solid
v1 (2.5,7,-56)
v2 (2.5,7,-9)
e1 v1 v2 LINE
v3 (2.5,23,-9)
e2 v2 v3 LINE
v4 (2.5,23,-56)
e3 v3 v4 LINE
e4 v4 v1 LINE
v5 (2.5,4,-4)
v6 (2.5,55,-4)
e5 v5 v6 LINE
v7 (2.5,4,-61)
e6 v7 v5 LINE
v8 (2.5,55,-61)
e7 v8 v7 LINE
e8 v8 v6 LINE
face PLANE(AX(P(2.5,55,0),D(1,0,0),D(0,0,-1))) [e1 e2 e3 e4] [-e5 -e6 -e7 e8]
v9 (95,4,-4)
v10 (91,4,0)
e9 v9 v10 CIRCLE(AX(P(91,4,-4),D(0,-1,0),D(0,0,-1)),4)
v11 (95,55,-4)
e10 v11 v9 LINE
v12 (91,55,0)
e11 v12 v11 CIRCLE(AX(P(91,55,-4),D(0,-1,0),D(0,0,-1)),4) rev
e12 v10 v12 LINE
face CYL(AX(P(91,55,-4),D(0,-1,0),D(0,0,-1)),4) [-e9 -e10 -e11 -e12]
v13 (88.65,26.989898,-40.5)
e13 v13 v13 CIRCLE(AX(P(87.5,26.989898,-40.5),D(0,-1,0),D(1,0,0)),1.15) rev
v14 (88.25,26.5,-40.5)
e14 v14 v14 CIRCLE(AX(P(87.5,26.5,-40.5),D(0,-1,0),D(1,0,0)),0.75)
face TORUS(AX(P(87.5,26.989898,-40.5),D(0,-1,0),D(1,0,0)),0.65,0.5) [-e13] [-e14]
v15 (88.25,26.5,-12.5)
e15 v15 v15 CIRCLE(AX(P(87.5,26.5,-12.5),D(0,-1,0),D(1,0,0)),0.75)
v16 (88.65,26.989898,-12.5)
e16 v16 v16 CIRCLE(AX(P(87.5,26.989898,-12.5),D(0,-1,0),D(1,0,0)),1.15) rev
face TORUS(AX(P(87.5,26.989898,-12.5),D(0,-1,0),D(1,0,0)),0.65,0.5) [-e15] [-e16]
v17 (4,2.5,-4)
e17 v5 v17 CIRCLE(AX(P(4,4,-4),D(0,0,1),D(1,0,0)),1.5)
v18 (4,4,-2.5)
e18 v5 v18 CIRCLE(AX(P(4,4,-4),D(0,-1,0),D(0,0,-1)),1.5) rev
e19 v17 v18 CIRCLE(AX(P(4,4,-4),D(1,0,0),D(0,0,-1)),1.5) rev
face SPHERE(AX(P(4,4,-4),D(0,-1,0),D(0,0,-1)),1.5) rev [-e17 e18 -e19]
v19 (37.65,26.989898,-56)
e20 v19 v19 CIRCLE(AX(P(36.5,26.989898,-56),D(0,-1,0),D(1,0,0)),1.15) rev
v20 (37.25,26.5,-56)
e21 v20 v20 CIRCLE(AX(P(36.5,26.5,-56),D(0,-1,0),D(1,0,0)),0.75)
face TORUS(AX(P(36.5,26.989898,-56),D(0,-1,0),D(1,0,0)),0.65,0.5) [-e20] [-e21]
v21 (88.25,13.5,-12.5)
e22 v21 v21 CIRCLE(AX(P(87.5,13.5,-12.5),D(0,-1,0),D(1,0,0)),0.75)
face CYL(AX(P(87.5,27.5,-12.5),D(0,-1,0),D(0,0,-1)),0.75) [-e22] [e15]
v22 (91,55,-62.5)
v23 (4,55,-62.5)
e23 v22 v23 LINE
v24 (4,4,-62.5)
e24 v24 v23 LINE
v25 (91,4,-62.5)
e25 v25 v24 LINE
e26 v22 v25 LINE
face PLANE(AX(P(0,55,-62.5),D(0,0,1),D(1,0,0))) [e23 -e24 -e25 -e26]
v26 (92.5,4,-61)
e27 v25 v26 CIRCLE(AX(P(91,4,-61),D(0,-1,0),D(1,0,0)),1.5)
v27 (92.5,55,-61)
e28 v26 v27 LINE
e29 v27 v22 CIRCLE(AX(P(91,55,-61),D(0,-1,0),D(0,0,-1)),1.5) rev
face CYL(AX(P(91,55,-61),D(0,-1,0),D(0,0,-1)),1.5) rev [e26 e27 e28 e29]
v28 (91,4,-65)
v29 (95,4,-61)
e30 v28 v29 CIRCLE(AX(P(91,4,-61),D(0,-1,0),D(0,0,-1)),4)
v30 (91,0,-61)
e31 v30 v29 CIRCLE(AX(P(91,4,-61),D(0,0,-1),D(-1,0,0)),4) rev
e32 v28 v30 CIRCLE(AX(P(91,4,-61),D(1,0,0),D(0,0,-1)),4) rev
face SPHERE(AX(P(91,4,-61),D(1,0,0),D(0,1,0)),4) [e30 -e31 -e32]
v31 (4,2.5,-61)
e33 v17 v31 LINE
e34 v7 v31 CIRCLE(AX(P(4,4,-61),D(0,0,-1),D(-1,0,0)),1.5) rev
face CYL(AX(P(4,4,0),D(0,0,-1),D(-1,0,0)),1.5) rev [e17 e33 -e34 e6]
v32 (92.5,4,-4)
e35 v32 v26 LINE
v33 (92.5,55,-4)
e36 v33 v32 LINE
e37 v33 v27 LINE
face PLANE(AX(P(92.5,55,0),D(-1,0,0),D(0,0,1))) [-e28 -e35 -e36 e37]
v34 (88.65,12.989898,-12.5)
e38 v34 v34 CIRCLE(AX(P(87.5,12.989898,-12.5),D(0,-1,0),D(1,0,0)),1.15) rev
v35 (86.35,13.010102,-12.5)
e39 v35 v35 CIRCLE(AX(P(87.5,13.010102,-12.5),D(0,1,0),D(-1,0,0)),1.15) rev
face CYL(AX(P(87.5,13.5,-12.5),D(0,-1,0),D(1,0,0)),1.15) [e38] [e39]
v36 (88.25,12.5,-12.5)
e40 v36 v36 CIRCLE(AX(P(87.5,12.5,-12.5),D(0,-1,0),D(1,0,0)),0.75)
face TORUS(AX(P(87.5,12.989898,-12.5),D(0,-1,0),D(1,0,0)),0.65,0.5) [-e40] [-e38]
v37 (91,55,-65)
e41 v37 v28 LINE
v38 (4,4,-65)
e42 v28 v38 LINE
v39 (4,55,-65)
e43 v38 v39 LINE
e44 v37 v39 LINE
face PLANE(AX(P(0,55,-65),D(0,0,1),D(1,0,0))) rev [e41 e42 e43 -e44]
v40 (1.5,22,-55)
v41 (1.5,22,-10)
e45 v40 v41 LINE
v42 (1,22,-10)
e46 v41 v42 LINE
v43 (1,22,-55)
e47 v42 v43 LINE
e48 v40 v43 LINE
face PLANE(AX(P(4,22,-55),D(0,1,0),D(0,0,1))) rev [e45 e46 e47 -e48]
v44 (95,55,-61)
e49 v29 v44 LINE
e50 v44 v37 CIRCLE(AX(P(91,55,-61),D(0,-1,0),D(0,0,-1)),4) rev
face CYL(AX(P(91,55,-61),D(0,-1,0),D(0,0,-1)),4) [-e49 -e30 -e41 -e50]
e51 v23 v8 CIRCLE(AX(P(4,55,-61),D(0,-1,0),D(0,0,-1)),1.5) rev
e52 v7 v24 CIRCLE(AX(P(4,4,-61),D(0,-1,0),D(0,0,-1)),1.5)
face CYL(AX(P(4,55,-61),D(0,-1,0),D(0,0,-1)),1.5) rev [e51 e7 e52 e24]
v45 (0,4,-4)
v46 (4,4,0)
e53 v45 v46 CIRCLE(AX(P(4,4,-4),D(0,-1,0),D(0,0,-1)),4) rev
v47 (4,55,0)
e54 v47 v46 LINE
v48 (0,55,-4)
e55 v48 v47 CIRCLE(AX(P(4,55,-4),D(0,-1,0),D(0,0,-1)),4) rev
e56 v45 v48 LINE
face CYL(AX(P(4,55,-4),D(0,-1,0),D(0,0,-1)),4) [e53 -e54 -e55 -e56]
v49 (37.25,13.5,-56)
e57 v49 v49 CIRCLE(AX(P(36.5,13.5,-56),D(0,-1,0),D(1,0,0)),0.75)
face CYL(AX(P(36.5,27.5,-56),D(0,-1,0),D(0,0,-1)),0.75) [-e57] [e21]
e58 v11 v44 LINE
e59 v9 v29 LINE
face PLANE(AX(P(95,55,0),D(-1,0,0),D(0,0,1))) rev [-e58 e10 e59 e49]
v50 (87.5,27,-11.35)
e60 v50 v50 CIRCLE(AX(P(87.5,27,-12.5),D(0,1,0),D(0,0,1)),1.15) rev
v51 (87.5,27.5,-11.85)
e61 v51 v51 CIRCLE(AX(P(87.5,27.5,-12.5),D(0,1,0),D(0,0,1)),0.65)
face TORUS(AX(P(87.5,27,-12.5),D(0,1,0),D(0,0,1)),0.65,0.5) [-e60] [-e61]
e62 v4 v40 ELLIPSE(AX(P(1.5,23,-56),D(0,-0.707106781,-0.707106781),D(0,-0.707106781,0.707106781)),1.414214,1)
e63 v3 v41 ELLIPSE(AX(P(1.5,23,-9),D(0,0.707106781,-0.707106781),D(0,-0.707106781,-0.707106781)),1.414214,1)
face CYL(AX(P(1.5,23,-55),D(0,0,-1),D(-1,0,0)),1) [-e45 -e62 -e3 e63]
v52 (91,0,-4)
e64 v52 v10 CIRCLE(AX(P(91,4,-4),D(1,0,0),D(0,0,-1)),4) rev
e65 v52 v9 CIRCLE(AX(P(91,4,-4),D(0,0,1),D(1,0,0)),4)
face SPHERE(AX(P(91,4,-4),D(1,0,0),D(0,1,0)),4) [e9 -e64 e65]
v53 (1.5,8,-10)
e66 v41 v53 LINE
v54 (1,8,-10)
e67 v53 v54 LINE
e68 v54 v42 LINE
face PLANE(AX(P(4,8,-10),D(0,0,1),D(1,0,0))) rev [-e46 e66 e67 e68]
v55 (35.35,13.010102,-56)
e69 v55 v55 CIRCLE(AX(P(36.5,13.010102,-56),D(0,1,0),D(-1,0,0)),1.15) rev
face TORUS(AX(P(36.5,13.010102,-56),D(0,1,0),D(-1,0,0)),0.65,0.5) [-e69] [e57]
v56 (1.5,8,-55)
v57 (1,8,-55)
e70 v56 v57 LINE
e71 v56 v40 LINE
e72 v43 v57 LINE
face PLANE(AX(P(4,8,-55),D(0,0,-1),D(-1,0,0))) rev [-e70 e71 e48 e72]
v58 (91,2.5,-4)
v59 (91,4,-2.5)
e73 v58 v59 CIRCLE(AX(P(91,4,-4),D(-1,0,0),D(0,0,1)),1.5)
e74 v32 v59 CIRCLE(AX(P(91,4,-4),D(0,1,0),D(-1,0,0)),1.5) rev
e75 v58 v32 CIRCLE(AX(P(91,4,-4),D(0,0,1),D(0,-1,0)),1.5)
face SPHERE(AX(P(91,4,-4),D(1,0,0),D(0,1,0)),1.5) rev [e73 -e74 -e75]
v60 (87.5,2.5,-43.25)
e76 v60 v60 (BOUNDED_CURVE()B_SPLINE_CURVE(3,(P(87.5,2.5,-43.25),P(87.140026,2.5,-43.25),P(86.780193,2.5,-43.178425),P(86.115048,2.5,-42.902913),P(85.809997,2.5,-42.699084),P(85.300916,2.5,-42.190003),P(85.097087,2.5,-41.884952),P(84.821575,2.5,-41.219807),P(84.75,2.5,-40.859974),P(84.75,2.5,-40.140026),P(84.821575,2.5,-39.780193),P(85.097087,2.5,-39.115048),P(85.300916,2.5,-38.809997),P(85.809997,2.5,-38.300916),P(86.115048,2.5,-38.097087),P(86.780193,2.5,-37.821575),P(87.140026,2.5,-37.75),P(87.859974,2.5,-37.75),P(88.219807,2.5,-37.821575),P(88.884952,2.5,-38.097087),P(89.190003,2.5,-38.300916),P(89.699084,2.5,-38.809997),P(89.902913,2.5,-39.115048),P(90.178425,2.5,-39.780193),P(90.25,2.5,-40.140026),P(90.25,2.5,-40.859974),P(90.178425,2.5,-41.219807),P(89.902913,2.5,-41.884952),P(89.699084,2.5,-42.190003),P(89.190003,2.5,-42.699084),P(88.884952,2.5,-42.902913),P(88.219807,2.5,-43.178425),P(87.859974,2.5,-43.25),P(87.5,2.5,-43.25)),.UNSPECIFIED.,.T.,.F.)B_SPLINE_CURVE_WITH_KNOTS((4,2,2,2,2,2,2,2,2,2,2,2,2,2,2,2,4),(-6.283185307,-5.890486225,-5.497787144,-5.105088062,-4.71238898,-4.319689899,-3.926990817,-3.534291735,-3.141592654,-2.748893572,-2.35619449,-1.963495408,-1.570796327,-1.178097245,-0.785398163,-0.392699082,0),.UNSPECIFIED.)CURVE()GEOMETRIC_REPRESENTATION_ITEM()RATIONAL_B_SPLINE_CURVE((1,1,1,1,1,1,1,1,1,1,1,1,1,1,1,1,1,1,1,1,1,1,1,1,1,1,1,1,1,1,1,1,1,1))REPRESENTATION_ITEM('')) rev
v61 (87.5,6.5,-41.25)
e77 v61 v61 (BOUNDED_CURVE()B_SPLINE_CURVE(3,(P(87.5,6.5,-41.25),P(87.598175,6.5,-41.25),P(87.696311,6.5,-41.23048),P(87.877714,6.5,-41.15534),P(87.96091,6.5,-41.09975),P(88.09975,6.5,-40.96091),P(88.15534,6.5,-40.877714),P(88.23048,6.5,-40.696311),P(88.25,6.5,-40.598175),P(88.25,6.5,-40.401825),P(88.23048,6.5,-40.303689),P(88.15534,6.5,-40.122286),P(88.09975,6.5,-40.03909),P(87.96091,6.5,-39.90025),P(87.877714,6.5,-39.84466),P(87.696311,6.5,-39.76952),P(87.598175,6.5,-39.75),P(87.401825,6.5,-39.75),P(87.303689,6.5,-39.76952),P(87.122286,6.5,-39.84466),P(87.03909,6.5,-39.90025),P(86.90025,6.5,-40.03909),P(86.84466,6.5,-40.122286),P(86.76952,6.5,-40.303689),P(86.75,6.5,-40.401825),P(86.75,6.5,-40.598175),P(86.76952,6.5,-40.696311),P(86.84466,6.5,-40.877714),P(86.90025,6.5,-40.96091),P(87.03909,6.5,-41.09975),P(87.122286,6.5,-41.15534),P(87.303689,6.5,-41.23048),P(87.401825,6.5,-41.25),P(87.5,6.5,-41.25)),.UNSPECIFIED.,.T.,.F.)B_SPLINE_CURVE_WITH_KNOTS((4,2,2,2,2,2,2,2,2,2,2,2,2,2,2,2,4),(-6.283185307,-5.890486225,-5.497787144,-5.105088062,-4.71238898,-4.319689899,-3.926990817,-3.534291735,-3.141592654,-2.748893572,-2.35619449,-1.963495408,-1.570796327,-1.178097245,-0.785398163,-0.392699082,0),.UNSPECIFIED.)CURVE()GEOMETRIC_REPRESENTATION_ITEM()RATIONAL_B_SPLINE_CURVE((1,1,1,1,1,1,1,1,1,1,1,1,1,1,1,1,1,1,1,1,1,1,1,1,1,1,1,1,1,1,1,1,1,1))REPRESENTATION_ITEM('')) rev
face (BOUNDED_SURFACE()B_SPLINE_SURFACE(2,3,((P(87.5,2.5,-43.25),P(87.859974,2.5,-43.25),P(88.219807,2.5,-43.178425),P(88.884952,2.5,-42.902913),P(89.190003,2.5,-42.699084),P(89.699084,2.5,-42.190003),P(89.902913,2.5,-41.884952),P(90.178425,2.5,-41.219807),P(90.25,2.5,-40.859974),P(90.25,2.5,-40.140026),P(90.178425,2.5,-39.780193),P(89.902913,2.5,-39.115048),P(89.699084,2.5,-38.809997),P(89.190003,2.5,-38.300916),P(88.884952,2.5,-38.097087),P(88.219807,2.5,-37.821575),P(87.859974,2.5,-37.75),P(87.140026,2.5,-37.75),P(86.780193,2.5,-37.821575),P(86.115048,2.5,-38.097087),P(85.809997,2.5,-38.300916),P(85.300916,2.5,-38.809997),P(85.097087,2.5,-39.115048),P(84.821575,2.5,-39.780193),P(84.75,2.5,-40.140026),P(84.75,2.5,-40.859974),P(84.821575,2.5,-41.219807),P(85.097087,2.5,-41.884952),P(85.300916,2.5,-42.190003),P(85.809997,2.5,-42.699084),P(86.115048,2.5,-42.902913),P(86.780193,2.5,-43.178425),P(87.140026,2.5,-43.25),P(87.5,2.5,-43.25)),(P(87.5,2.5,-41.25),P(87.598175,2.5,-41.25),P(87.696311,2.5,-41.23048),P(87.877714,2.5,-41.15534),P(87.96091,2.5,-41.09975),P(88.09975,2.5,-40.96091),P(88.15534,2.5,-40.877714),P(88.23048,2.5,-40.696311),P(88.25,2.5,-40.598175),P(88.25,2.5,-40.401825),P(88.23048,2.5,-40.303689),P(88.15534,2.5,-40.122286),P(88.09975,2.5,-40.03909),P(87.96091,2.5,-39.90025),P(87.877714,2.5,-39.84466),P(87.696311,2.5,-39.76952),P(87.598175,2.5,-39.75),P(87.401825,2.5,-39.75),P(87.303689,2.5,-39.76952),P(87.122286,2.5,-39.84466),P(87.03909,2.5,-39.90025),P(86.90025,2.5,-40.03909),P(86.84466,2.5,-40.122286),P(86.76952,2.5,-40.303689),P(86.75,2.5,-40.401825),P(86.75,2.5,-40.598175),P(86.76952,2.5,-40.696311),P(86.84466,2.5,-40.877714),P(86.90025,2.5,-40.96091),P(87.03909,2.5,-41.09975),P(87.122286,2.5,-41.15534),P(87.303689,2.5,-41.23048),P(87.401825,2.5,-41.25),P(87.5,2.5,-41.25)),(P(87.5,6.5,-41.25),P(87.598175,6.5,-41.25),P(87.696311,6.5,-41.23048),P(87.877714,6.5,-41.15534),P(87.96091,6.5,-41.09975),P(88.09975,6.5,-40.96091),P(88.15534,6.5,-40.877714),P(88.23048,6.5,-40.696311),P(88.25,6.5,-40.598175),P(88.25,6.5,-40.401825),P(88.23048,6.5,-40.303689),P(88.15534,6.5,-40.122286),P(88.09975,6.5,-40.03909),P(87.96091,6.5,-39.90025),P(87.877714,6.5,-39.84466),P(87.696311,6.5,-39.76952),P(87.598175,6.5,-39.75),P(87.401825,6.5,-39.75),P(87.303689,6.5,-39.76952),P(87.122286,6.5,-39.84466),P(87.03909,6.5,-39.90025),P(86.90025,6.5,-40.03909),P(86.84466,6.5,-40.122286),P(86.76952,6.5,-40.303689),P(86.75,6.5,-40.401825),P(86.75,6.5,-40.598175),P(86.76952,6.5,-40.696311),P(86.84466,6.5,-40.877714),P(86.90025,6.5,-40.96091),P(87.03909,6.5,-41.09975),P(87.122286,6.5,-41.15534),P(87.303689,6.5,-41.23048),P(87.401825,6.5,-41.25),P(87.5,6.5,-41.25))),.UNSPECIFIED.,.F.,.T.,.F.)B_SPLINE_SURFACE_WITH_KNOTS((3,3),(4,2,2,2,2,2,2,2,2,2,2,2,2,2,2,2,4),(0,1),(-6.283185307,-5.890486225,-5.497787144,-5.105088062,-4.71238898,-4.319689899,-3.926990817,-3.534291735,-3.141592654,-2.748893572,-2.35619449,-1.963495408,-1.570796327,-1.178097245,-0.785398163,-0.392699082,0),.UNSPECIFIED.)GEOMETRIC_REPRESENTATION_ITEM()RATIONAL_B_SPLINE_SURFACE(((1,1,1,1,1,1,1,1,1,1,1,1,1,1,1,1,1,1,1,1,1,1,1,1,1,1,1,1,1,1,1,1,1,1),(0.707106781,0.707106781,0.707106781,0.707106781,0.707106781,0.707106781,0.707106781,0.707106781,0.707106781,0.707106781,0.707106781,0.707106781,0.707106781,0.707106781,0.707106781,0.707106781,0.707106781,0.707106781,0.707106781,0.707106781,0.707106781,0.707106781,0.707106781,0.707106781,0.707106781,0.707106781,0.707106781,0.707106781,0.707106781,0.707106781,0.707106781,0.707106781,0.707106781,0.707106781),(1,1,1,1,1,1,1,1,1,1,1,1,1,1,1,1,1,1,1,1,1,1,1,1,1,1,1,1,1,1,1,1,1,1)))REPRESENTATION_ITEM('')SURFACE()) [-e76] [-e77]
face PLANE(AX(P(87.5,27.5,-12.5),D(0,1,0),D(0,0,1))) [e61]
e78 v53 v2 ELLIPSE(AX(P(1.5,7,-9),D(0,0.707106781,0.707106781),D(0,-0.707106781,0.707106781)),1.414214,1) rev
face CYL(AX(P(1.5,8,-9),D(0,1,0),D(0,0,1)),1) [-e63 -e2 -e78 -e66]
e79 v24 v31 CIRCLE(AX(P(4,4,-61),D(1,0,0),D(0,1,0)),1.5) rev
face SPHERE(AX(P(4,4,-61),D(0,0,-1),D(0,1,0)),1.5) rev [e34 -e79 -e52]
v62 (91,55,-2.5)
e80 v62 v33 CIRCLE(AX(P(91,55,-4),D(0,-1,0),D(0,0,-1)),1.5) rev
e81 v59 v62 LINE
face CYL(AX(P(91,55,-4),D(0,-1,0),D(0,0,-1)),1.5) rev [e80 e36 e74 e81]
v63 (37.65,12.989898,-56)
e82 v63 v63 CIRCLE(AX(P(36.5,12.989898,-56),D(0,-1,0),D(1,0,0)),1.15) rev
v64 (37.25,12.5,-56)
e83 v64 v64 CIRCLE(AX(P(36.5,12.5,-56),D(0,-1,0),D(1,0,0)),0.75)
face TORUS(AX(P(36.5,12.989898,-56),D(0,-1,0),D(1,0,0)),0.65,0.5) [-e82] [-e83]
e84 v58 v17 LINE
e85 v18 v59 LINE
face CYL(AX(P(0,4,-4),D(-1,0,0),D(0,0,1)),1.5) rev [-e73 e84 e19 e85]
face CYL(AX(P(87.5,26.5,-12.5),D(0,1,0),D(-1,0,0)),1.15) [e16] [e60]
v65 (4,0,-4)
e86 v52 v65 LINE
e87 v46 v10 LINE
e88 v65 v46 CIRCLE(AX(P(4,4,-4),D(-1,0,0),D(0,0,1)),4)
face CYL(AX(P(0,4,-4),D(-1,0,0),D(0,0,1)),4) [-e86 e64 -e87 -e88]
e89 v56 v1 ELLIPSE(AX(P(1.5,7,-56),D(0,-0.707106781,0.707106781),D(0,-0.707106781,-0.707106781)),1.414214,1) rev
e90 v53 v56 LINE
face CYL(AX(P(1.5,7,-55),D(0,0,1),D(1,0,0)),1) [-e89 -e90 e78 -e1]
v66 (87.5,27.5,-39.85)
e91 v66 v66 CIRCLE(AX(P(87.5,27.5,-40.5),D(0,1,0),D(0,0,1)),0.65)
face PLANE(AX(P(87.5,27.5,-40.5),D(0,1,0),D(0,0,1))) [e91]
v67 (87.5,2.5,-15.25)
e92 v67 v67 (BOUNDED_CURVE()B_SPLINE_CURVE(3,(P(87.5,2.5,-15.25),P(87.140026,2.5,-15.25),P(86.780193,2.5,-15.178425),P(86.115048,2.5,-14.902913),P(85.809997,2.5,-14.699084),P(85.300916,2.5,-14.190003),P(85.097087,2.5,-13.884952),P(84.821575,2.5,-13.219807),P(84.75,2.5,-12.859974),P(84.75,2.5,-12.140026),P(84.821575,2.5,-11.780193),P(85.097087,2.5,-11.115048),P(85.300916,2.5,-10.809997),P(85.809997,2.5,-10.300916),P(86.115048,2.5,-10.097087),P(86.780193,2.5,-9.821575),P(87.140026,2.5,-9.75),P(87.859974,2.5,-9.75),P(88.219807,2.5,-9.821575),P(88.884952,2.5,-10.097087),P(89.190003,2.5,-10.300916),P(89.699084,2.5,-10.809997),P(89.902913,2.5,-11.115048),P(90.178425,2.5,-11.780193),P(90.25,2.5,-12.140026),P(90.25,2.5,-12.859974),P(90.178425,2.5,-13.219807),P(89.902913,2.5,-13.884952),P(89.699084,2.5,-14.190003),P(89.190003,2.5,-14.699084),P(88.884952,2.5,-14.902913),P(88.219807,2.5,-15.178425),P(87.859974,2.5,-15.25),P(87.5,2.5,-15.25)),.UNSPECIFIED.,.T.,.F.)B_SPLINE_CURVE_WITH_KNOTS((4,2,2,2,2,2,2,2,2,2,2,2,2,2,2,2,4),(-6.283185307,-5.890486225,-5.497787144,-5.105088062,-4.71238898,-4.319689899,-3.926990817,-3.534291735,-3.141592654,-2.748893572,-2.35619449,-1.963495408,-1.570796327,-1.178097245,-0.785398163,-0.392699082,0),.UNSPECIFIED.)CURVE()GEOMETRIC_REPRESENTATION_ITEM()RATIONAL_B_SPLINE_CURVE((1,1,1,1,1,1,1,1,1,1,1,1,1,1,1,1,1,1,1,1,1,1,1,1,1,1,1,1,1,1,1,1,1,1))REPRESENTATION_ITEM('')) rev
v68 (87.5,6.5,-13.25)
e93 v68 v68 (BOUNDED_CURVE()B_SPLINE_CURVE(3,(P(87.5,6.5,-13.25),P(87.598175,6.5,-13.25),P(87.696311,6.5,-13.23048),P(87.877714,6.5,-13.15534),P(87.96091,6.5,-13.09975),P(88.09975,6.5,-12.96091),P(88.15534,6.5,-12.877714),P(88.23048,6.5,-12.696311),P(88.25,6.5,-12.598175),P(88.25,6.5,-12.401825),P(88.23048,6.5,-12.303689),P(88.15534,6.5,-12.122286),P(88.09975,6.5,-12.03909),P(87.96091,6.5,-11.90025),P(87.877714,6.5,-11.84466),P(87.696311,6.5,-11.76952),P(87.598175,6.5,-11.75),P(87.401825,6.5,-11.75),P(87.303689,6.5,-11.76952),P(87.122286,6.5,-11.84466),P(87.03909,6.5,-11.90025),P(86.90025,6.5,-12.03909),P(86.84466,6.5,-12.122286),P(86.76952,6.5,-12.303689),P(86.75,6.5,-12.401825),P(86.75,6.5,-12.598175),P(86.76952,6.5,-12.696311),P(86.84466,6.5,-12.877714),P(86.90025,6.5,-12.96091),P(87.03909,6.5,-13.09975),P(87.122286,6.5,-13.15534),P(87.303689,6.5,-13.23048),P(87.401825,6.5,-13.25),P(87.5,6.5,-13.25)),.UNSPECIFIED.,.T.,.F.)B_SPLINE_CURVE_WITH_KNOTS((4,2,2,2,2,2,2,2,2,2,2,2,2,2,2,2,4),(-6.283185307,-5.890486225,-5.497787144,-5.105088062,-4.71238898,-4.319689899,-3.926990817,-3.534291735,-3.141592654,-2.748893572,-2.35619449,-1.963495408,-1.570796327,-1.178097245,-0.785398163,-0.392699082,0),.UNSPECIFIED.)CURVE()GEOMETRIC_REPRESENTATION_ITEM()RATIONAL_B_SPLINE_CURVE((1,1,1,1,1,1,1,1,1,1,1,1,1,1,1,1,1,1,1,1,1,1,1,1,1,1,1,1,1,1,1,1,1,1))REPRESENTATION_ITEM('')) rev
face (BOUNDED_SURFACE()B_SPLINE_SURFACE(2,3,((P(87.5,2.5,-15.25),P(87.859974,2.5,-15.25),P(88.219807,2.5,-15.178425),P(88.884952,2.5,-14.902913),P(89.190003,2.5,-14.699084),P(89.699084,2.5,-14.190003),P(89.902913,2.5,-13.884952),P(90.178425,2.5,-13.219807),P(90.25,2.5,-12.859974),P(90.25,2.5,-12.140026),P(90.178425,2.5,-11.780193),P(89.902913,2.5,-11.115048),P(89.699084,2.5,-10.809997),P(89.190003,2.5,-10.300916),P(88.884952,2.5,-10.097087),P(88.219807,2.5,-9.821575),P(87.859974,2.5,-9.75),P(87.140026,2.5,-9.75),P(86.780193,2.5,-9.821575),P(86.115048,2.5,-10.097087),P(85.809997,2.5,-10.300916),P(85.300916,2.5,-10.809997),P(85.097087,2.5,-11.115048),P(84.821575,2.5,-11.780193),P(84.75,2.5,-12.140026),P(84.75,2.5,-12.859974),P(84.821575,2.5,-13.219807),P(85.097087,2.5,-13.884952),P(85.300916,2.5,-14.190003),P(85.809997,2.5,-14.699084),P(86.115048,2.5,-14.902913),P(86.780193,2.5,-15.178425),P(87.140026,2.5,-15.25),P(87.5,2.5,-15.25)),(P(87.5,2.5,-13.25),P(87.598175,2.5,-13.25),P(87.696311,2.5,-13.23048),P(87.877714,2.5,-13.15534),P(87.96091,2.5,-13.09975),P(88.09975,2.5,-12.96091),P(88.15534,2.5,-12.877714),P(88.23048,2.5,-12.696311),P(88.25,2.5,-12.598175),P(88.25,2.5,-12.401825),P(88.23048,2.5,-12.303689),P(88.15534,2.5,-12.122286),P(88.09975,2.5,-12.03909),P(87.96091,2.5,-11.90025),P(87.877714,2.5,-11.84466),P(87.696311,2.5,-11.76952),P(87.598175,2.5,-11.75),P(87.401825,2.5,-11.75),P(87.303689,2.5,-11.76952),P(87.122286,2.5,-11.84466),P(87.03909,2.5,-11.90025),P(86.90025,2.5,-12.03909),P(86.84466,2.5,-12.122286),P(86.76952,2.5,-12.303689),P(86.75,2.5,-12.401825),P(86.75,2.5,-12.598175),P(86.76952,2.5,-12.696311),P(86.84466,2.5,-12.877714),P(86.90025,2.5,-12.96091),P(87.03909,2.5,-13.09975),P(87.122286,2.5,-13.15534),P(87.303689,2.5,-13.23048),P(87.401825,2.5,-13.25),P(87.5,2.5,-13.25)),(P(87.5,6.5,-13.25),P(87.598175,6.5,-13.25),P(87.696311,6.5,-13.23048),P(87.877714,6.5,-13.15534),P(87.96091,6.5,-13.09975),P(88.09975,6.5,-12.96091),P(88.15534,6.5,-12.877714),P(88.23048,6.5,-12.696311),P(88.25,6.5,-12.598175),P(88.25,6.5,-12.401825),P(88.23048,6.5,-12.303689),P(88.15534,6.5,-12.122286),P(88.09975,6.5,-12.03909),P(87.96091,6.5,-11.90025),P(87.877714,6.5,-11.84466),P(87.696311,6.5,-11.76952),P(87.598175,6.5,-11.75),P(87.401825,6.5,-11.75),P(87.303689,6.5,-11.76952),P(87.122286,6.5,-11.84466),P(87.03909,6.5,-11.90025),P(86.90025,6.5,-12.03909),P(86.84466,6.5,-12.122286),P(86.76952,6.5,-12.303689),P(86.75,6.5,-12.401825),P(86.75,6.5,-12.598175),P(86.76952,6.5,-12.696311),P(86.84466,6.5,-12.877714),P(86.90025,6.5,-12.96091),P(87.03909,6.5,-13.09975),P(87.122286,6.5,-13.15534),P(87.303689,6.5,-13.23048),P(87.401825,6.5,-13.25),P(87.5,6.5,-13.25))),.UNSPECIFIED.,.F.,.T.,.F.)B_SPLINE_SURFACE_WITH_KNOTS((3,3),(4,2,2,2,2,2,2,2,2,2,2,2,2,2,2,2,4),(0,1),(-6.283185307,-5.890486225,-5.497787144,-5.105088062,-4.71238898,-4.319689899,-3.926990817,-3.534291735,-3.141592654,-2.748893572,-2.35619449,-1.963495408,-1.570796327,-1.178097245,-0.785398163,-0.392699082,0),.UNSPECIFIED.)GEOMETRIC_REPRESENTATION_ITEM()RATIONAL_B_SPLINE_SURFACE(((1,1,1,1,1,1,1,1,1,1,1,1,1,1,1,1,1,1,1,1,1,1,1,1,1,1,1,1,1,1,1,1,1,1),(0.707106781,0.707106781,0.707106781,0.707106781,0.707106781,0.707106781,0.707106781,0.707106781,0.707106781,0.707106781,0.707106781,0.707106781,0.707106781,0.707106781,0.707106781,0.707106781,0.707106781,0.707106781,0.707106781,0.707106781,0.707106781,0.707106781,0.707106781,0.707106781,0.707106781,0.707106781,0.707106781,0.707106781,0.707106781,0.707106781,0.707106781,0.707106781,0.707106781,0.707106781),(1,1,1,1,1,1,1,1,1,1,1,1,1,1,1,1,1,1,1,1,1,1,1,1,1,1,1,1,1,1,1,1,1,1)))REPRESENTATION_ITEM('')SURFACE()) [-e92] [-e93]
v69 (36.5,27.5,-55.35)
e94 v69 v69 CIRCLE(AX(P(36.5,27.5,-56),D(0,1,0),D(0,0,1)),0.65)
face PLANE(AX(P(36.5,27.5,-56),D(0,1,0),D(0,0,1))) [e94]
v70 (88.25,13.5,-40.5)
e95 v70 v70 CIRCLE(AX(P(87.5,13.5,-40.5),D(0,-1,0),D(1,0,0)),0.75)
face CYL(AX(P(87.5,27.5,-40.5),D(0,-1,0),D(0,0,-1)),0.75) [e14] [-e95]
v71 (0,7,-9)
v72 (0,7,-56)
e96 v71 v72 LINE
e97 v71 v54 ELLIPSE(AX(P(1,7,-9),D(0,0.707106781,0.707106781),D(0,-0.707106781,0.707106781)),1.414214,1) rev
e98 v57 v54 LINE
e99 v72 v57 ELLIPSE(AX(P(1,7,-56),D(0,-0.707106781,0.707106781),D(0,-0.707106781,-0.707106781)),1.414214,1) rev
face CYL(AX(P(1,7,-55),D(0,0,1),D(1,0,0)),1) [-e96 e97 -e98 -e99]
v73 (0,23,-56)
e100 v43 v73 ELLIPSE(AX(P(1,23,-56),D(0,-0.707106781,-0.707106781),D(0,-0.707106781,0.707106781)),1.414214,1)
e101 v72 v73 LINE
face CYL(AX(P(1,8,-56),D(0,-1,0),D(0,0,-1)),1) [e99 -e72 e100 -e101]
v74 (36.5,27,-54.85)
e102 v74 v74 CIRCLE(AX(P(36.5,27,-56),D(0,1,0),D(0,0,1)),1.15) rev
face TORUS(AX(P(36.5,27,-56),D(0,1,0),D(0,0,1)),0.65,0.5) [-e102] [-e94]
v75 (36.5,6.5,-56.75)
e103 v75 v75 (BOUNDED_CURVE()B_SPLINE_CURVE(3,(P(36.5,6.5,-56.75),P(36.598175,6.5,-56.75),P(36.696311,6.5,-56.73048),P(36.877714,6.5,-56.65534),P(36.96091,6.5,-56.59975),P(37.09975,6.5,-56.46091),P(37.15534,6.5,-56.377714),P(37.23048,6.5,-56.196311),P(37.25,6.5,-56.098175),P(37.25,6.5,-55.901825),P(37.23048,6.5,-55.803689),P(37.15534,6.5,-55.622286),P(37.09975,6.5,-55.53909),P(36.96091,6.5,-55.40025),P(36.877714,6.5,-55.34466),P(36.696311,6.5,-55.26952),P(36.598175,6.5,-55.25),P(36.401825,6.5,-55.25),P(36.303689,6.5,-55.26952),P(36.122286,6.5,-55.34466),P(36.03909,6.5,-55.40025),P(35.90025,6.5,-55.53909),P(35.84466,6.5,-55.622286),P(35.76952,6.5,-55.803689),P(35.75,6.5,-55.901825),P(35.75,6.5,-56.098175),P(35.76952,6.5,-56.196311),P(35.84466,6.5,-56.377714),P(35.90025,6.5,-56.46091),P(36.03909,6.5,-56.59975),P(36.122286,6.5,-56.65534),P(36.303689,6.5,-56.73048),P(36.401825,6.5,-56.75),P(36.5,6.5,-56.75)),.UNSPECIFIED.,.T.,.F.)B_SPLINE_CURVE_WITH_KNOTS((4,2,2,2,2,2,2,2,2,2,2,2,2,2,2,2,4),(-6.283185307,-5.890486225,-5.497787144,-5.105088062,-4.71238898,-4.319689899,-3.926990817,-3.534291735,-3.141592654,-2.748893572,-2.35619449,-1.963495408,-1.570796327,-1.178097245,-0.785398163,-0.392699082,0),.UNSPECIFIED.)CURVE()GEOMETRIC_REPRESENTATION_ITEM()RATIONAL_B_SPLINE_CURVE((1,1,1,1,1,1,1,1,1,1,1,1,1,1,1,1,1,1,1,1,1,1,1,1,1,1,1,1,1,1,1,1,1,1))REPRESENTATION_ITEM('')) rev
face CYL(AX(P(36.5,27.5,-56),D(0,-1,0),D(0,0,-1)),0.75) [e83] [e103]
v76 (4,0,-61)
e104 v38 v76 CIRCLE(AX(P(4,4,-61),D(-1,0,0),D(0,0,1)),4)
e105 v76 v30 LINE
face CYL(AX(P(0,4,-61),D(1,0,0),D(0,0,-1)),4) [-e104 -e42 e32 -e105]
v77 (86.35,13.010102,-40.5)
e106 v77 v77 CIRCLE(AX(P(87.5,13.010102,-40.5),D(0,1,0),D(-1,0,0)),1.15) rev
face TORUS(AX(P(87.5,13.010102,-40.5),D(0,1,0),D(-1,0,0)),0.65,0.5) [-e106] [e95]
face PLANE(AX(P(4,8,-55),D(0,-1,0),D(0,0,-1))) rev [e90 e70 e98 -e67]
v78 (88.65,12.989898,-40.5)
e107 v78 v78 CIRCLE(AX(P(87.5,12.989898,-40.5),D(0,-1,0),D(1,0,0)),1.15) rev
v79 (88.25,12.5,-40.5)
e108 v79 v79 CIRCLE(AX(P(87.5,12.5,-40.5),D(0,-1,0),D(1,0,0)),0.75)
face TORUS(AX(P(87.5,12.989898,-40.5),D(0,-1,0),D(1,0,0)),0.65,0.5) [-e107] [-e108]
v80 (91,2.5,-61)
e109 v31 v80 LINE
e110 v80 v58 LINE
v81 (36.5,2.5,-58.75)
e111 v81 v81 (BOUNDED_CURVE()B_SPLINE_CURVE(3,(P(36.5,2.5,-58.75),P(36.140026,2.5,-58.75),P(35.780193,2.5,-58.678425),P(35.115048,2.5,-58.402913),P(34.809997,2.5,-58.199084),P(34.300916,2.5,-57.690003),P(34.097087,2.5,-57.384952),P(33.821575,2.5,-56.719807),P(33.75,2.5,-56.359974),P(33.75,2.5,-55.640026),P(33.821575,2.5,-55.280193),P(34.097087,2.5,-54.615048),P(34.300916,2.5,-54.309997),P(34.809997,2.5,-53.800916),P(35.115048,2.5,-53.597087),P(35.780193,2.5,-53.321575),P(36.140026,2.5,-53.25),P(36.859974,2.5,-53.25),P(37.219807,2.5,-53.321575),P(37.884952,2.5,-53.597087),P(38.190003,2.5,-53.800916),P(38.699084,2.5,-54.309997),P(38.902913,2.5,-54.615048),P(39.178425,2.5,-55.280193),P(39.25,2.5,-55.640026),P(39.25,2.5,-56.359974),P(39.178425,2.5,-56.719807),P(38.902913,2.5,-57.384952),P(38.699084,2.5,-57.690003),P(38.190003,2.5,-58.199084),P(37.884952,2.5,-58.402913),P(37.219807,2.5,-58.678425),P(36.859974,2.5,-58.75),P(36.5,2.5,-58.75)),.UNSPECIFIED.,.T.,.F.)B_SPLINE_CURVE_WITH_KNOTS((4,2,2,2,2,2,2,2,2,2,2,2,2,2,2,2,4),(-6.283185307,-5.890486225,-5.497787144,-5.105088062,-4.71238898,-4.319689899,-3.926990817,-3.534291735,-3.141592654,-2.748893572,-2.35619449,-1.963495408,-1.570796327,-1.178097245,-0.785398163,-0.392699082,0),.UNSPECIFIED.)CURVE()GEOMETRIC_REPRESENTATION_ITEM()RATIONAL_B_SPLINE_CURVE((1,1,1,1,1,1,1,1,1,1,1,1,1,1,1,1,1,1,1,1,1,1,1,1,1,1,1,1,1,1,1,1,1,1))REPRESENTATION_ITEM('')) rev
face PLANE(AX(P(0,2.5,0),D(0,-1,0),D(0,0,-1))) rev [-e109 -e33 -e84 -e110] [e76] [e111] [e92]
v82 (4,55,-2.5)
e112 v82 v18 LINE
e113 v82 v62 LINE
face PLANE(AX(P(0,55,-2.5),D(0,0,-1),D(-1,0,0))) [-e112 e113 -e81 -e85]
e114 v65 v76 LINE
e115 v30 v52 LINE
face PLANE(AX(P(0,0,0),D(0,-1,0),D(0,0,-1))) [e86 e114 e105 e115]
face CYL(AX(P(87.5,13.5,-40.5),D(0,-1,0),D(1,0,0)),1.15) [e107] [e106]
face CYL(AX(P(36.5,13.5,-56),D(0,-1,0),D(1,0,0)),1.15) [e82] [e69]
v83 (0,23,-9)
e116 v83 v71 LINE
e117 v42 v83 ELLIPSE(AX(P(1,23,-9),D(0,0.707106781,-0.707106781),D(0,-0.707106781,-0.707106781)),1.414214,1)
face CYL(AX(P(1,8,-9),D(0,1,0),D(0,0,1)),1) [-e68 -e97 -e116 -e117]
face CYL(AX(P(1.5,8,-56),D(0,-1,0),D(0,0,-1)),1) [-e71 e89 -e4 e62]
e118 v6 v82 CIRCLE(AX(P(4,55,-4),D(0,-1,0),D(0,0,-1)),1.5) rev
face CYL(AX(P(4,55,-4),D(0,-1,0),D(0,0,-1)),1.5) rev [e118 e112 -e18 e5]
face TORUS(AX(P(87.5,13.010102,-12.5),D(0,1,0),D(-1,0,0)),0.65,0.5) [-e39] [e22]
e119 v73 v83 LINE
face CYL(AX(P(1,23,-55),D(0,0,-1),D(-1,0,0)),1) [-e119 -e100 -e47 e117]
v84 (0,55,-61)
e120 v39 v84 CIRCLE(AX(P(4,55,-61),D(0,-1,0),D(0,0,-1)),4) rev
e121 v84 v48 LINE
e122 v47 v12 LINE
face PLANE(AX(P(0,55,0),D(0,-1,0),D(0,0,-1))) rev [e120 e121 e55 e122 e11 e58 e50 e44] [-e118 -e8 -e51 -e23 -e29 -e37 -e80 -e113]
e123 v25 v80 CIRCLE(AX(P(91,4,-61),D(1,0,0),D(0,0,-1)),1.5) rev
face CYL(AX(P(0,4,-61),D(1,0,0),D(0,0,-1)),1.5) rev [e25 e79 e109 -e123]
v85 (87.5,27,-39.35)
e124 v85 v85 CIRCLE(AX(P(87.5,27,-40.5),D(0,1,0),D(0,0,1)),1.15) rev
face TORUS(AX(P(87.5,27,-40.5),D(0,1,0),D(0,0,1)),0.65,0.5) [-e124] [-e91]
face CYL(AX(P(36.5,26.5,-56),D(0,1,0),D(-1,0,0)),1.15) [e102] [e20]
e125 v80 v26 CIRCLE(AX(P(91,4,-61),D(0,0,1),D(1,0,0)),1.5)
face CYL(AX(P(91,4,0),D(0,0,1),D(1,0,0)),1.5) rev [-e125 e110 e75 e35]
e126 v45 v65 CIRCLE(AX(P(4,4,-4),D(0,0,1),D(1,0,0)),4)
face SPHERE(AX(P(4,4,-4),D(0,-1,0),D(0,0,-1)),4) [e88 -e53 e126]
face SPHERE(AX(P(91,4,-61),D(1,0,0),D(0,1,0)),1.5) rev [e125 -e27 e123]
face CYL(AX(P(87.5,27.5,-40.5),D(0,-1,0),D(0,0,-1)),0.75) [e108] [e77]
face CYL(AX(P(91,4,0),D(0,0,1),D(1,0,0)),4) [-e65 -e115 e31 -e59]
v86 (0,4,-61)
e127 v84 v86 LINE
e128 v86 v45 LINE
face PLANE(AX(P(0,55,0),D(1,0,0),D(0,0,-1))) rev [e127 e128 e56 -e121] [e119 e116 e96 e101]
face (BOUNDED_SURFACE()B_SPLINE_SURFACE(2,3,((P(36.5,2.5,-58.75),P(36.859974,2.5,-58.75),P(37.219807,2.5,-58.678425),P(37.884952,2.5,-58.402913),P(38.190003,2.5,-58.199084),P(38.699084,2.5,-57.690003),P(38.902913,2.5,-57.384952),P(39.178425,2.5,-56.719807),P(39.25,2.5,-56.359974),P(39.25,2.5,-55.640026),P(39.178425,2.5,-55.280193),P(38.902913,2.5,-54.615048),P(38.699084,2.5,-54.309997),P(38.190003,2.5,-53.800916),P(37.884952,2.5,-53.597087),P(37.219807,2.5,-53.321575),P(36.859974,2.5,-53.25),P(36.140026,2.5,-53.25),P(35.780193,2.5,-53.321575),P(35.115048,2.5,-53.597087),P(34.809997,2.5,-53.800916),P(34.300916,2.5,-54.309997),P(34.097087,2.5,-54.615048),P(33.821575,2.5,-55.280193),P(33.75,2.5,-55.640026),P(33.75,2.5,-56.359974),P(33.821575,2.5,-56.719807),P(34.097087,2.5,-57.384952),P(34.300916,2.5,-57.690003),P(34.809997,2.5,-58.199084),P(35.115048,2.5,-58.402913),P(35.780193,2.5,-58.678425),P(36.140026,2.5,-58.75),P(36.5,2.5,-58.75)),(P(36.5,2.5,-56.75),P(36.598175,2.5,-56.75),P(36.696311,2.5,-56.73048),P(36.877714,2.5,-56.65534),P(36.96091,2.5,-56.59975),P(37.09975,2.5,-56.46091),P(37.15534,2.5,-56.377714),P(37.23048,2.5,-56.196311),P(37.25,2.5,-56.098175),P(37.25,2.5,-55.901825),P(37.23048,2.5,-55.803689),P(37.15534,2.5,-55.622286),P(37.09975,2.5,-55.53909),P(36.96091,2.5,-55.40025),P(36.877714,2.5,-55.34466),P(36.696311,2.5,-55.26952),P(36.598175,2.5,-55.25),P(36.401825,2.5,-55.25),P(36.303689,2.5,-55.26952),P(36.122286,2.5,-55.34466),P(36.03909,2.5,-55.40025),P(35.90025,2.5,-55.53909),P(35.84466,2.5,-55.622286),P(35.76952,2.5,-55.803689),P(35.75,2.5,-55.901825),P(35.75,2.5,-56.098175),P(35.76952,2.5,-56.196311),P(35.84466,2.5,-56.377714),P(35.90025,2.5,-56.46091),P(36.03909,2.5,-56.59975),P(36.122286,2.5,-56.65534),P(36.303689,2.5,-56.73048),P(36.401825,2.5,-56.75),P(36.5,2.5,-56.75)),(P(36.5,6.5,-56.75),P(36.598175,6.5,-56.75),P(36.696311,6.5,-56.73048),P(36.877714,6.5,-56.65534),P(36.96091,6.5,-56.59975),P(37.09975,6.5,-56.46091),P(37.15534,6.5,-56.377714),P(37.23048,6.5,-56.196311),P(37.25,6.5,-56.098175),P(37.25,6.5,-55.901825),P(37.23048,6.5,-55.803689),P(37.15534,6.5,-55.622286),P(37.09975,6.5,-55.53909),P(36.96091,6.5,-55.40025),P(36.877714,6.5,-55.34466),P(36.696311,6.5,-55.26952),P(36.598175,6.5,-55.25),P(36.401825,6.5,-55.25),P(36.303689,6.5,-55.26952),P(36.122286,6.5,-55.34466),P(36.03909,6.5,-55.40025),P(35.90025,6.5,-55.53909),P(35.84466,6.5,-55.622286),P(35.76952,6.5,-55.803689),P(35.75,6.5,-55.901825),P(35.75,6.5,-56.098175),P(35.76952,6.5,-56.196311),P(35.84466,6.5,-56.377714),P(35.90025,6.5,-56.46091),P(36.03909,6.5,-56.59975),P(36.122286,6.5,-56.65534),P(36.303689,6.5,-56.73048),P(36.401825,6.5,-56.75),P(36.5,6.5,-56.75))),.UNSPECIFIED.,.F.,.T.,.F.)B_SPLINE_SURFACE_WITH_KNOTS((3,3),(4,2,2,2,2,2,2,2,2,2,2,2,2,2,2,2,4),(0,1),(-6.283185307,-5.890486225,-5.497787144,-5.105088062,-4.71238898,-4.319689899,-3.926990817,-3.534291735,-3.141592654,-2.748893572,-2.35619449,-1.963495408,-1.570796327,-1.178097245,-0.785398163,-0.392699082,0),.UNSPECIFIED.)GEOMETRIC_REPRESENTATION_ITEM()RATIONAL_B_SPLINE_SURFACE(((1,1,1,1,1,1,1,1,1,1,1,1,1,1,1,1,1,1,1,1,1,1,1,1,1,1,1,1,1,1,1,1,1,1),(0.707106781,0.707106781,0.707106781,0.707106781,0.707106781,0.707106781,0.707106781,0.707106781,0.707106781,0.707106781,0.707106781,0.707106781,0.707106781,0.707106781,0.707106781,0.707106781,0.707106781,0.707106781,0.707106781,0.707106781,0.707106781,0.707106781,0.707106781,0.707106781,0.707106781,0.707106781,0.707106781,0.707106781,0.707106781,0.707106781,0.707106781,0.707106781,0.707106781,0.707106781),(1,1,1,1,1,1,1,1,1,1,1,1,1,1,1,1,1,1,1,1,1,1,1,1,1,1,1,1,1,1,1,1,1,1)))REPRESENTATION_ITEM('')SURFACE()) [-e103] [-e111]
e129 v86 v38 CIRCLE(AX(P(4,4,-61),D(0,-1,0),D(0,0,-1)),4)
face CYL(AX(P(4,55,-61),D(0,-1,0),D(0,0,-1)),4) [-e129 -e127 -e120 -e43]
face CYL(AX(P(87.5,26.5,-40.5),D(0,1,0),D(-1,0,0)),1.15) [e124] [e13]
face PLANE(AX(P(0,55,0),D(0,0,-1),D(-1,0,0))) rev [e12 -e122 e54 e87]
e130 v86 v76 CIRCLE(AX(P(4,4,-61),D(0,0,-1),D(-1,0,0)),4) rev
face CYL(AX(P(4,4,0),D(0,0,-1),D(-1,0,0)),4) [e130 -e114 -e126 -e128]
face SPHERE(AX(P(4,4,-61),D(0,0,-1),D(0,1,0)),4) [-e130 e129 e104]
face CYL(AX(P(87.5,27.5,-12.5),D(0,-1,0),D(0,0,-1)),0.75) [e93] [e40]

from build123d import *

# Parameters (mm, degrees)
SKETCH2_W           = 95
SKETCH2_H           = 65
BOSS_EXTRUDE1_DEPTH = 55
FILLET2_R           = 4
SHELL1_T            = -2.5
SKETCH10_R          = 0.75
BOSS_EXTRUDE2_DEPTH = 25
FILLET3_SIZE        = 2
FILLET3_SIZE_2      = 4
SKETCH12_R          = 1.15
BOSS_EXTRUDE3_DEPTH = 1
BOSS_EXTRUDE4_START = 1
SKETCH14_R          = 1.15
BOSS_EXTRUDE4_DEPTH = 1
FILLET4_R           = 0.5
SKETCH16_W          = 45
SKETCH16_H          = 14
CUT_EXTRUDE1_DEPTH  = 4
FILLET5_R           = 1


with BuildPart() as part:
    # Sketch2 → Boss-Extrude1 (new body)
    with BuildSketch(Plane(origin=(0, 0, 0), x_dir=(1, 0, 0), z_dir=(0, 1, 0))):
        with Locations((47.5, 32.5)):
            Rectangle(SKETCH2_W, SKETCH2_H)
    extrude(amount=BOSS_EXTRUDE1_DEPTH)

    # Fillet2
    fillet2_edges = [part.edges().sort_by_distance(p)[0] for p in [
        (47.5, 0, -65),
        (95, 0, -32.5),
        (47.5, 0, 0),
        (0, 0, -32.5),
        (0, 27.5, -65),
        (95, 27.5, -65),
        (95, 27.5, 0),
        (0, 27.5, 0),
    ]]
    fillet(fillet2_edges, radius=FILLET2_R)

    # Shell1
    shell1_openings = [part.faces().sort_by_distance(p)[0] for p in [
        (47.5, 55, -32.5),
    ]]
    offset(amount=SHELL1_T, openings=shell1_openings, kind=Kind.INTERSECTION)

    # Sketch10 → Boss-Extrude2 (add)
    with BuildSketch(Plane(origin=(0, 2.5, 0), x_dir=(1, 0, 0), z_dir=(0, 1, 0))):
        with Locations(Location((87.5, 12.5, 0), (0, 0, 90))):
            Circle(SKETCH10_R)
        with Locations(Location((87.5, 40.5, 0), (0, 0, 90))):
            Circle(SKETCH10_R)
        with Locations(Location((36.5, 56, 0), (0, 0, 90))):
            Circle(SKETCH10_R)
    extrude(amount=BOSS_EXTRUDE2_DEPTH)

    # Fillet3
    # an asymmetric fillet: 4, 2 mm, written as the material it adds along each edge
    with BuildSketch(Plane(origin=(87.5, 2.5, -12.5), x_dir=(0, 0, -1), z_dir=(1, 0, 0))) as fillet3_piece_1:
        with BuildLine():
            Bezier((0.75 + FILLET3_SIZE, 0), (0.75, 0), (0.75, FILLET3_SIZE_2), weights=[1, 0.707106781, 1])
            Line((0.75, FILLET3_SIZE_2), (0.75, 0))
            Line((0.75, 0), (0.75 + FILLET3_SIZE, 0))
        make_face()
    revolve(axis=Axis((87.5, 2.5, -12.5), (0, 1, 0)))
    with BuildSketch(Plane(origin=(87.5, 2.5, -40.5), x_dir=(0, 0, -1), z_dir=(1, 0, 0))) as fillet3_piece_2:
        with BuildLine():
            Bezier((0.75 + FILLET3_SIZE, 0), (0.75, 0), (0.75, FILLET3_SIZE_2), weights=[1, 0.707106781, 1])
            Line((0.75, FILLET3_SIZE_2), (0.75, 0))
            Line((0.75, 0), (0.75 + FILLET3_SIZE, 0))
        make_face()
    revolve(axis=Axis((87.5, 2.5, -40.5), (0, 1, 0)))
    with BuildSketch(Plane(origin=(36.5, 2.5, -56), x_dir=(0, 0, -1), z_dir=(1, 0, 0))) as fillet3_piece_3:
        with BuildLine():
            Bezier((0.75 + FILLET3_SIZE, 0), (0.75, 0), (0.75, FILLET3_SIZE_2), weights=[1, 0.707106781, 1])
            Line((0.75, FILLET3_SIZE_2), (0.75, 0))
            Line((0.75, 0), (0.75 + FILLET3_SIZE, 0))
        make_face()
    revolve(axis=Axis((36.5, 2.5, -56), (0, 1, 0)))

    # Sketch12 → Boss-Extrude3 (add)
    with BuildSketch(Plane(origin=(0, 12.5, 0), x_dir=(-1, 0, 0), z_dir=(0, -1, 0))):
        with Locations(Location((-36.5, 56, 0), (0, 0, 180))):
            Circle(SKETCH12_R)
        with Locations(Location((-87.5, 40.5, 0), (0, 0, 180))):
            Circle(SKETCH12_R)
        with Locations(Location((-87.5, 12.5, 0), (0, 0, 180))):
            Circle(SKETCH12_R)
    extrude(amount=-BOSS_EXTRUDE3_DEPTH)

    # Sketch14 → Boss-Extrude4 (add)
    with BuildSketch(Plane(origin=(0, 27.5, 0), x_dir=(-1, 0, 0), z_dir=(0, -1, 0)).offset(BOSS_EXTRUDE4_START)):
        with Locations(Location((-36.5, 56, 0), (0, 0, 180))):
            Circle(SKETCH14_R)
        with Locations(Location((-87.5, 40.5, 0), (0, 0, 180))):
            Circle(SKETCH14_R)
        with Locations(Location((-87.5, 12.5, 0), (0, 0, 180))):
            Circle(SKETCH14_R)
    extrude(amount=-BOSS_EXTRUDE4_DEPTH)

    # Fillet4
    # the kernel refuses this fillet: 0.5 mm, written as the material it takes off along each edge
    with BuildSketch(Plane(origin=(36.5, 13.5, -56), x_dir=(1, 0, 0), z_dir=(0, 0, -1))) as fillet4_piece_1:
        with BuildLine():
            CenterArc((0.65, 0.489897949), FILLET4_R, 281.536959033, 78.463040967)
            Line((0.75, 0), (0.752, -0.009797959))
            ThreePointArc((0.752, -0.009797959), (0.95, -0.01), (1.15, -0.01))
            Line((1.15, -0.01), (1.16, 0))
            Line((1.16, 0), (1.16, 0.489897949))
            Line((1.16, 0.489897949), (1.15, 0.489897949))
        make_face()
    revolve(axis=Axis((36.5, 13.5, -56), (0, -1, 0)), mode=Mode.SUBTRACT)
    with BuildSketch(Plane(origin=(36.5, 12.5, -56), x_dir=(1, 0, 0), z_dir=(0, 0, -1))) as fillet4_piece_2:
        with BuildLine():
            CenterArc((0.65, -0.489897949), FILLET4_R, 360, 78.463040967)
            Line((1.15, -0.489897949), (1.16, -0.489897949))
            Line((1.16, -0.489897949), (1.16, 0))
            Line((1.16, 0), (1.15, 0.01))
            ThreePointArc((1.15, 0.01), (0.95, 0.01), (0.752, 0.009797959))
            Line((0.752, 0.009797959), (0.75, 0))
        make_face()
    revolve(axis=Axis((36.5, 12.5, -56), (0, -1, 0)), mode=Mode.SUBTRACT)
    with BuildSketch(Plane(origin=(87.5, 13.5, -40.5), x_dir=(1, 0, 0), z_dir=(0, 0, -1))) as fillet4_piece_3:
        with BuildLine():
            CenterArc((0.65, 0.489897949), FILLET4_R, 281.536959033, 78.463040967)
            Line((0.75, 0), (0.752, -0.009797959))
            ThreePointArc((0.752, -0.009797959), (0.95, -0.01), (1.15, -0.01))
            Line((1.15, -0.01), (1.16, 0))
            Line((1.16, 0), (1.16, 0.489897949))
            Line((1.16, 0.489897949), (1.15, 0.489897949))
        make_face()
    revolve(axis=Axis((87.5, 13.5, -40.5), (0, -1, 0)), mode=Mode.SUBTRACT)
    with BuildSketch(Plane(origin=(87.5, 12.5, -40.5), x_dir=(1, 0, 0), z_dir=(0, 0, -1))) as fillet4_piece_4:
        with BuildLine():
            CenterArc((0.65, -0.489897949), FILLET4_R, 0, 78.463040967)
            Line((1.15, -0.489897949), (1.16, -0.489897949))
            Line((1.16, -0.489897949), (1.16, 0))
            Line((1.16, 0), (1.15, 0.01))
            ThreePointArc((1.15, 0.01), (0.95, 0.01), (0.752, 0.009797959))
            Line((0.752, 0.009797959), (0.75, 0))
        make_face()
    revolve(axis=Axis((87.5, 12.5, -40.5), (0, -1, 0)), mode=Mode.SUBTRACT)
    with BuildSketch(Plane(origin=(87.5, 13.5, -12.5), x_dir=(1, 0, 0), z_dir=(0, 0, -1))) as fillet4_piece_5:
        with BuildLine():
            CenterArc((0.65, 0.489897949), FILLET4_R, 281.536959033, 78.463040967)
            Line((0.75, 0), (0.752, -0.009797959))
            ThreePointArc((0.752, -0.009797959), (0.95, -0.01), (1.15, -0.01))
            Line((1.15, -0.01), (1.16, 0))
            Line((1.16, 0), (1.16, 0.489897949))
            Line((1.16, 0.489897949), (1.15, 0.489897949))
        make_face()
    revolve(axis=Axis((87.5, 13.5, -12.5), (0, -1, 0)), mode=Mode.SUBTRACT)
    with BuildSketch(Plane(origin=(87.5, 12.5, -12.5), x_dir=(1, 0, 0), z_dir=(0, 0, -1))) as fillet4_piece_6:
        with BuildLine():
            CenterArc((0.65, -0.489897949), FILLET4_R, 0, 78.463040967)
            Line((1.15, -0.489897949), (1.16, -0.489897949))
            Line((1.16, -0.489897949), (1.16, 0))
            Line((1.16, 0), (1.15, 0.01))
            ThreePointArc((1.15, 0.01), (0.95, 0.01), (0.752, 0.009797959))
            Line((0.752, 0.009797959), (0.75, 0))
        make_face()
    revolve(axis=Axis((87.5, 12.5, -12.5), (0, -1, 0)), mode=Mode.SUBTRACT)
    with BuildSketch(Plane(origin=(36.5, 27.5, -56), x_dir=(1, 0, 0), z_dir=(0, 0, -1))) as fillet4_piece_7:
        with BuildLine():
            CenterArc((1.15 - FILLET4_R, FILLET4_R), FILLET4_R, 270, 90)
            Line((1.15 - FILLET4_R, 0), (1.15 - FILLET4_R, -FILLET4_R * 0.02))
            Line((1.15 - FILLET4_R, -FILLET4_R * 0.02), (1.15 + FILLET4_R * 0.02, -FILLET4_R * 0.02))
            Line((1.15 + FILLET4_R * 0.02, -FILLET4_R * 0.02), (1.15 + FILLET4_R * 0.02, FILLET4_R))
            Line((1.15 + FILLET4_R * 0.02, FILLET4_R), (1.15, FILLET4_R))
        make_face()
    revolve(axis=Axis((36.5, 27.5, -56), (0, -1, 0)), mode=Mode.SUBTRACT)
    with BuildSketch(Plane(origin=(36.5, 26.5, -56), x_dir=(1, 0, 0), z_dir=(0, 0, -1))) as fillet4_piece_8:
        with BuildLine():
            CenterArc((0.65, -0.489897949), FILLET4_R, 0, 78.463040967)
            Line((1.15, -0.489897949), (1.16, -0.489897949))
            Line((1.16, -0.489897949), (1.16, 0))
            Line((1.16, 0), (1.15, 0.01))
            ThreePointArc((1.15, 0.01), (0.95, 0.01), (0.752, 0.009797959))
            Line((0.752, 0.009797959), (0.75, 0))
        make_face()
    revolve(axis=Axis((36.5, 26.5, -56), (0, -1, 0)), mode=Mode.SUBTRACT)
    with BuildSketch(Plane(origin=(87.5, 27.5, -40.5), x_dir=(1, 0, 0), z_dir=(0, 0, -1))) as fillet4_piece_9:
        with BuildLine():
            CenterArc((1.15 - FILLET4_R, FILLET4_R), FILLET4_R, 270, 90)
            Line((1.15 - FILLET4_R, 0), (1.15 - FILLET4_R, -FILLET4_R * 0.02))
            Line((1.15 - FILLET4_R, -FILLET4_R * 0.02), (1.15 + FILLET4_R * 0.02, -FILLET4_R * 0.02))
            Line((1.15 + FILLET4_R * 0.02, -FILLET4_R * 0.02), (1.15 + FILLET4_R * 0.02, FILLET4_R))
            Line((1.15 + FILLET4_R * 0.02, FILLET4_R), (1.15, FILLET4_R))
        make_face()
    revolve(axis=Axis((87.5, 27.5, -40.5), (0, -1, 0)), mode=Mode.SUBTRACT)
    with BuildSketch(Plane(origin=(87.5, 26.5, -40.5), x_dir=(1, 0, 0), z_dir=(0, 0, -1))) as fillet4_piece_10:
        with BuildLine():
            CenterArc((0.65, -0.489897949), FILLET4_R, 0, 78.463040967)
            Line((1.15, -0.489897949), (1.16, -0.489897949))
            Line((1.16, -0.489897949), (1.16, 0))
            Line((1.16, 0), (1.15, 0.01))
            ThreePointArc((1.15, 0.01), (0.95, 0.01), (0.752, 0.009797959))
            Line((0.752, 0.009797959), (0.75, 0))
        make_face()
    revolve(axis=Axis((87.5, 26.5, -40.5), (0, -1, 0)), mode=Mode.SUBTRACT)
    with BuildSketch(Plane(origin=(87.5, 27.5, -12.5), x_dir=(1, 0, 0), z_dir=(0, 0, -1))) as fillet4_piece_11:
        with BuildLine():
            CenterArc((1.15 - FILLET4_R, FILLET4_R), FILLET4_R, 270, 90)
            Line((1.15 - FILLET4_R, 0), (1.15 - FILLET4_R, -FILLET4_R * 0.02))
            Line((1.15 - FILLET4_R, -FILLET4_R * 0.02), (1.15 + FILLET4_R * 0.02, -FILLET4_R * 0.02))
            Line((1.15 + FILLET4_R * 0.02, -FILLET4_R * 0.02), (1.15 + FILLET4_R * 0.02, FILLET4_R))
            Line((1.15 + FILLET4_R * 0.02, FILLET4_R), (1.15, FILLET4_R))
        make_face()
    revolve(axis=Axis((87.5, 27.5, -12.5), (0, -1, 0)), mode=Mode.SUBTRACT)
    with BuildSketch(Plane(origin=(87.5, 26.5, -12.5), x_dir=(1, 0, 0), z_dir=(0, 0, -1))) as fillet4_piece_12:
        with BuildLine():
            CenterArc((0.65, -0.489897949), FILLET4_R, 0, 78.463040967)
            Line((1.15, -0.489897949), (1.16, -0.489897949))
            Line((1.16, -0.489897949), (1.16, 0))
            Line((1.16, 0), (1.15, 0.01))
            ThreePointArc((1.15, 0.01), (0.95, 0.01), (0.752, 0.009797959))
            Line((0.752, 0.009797959), (0.75, 0))
        make_face()
    revolve(axis=Axis((87.5, 26.5, -12.5), (0, -1, 0)), mode=Mode.SUBTRACT)

    # Sketch16 → Cut-Extrude1 (cut)
    with BuildSketch(Plane.ZY):
        with Locations((-32.5, 15)):
            Rectangle(SKETCH16_W, SKETCH16_H)
    extrude(amount=-CUT_EXTRUDE1_DEPTH, mode=Mode.SUBTRACT)

    # Fillet5
    fillet5_edges = [part.edges().sort_by_distance(p)[0] for p in [
        (2.5, 8, -32.5),
        (2.5, 15, -10),
        (2.5, 22, -32.5),
        (2.5, 15, -55),
        (0, 15, -55),
        (0, 8, -32.5),
        (0, 15, -10),
        (0, 22, -32.5),
    ]]
    fillet(fillet5_edges, radius=FILLET5_R)


solid = part.part
